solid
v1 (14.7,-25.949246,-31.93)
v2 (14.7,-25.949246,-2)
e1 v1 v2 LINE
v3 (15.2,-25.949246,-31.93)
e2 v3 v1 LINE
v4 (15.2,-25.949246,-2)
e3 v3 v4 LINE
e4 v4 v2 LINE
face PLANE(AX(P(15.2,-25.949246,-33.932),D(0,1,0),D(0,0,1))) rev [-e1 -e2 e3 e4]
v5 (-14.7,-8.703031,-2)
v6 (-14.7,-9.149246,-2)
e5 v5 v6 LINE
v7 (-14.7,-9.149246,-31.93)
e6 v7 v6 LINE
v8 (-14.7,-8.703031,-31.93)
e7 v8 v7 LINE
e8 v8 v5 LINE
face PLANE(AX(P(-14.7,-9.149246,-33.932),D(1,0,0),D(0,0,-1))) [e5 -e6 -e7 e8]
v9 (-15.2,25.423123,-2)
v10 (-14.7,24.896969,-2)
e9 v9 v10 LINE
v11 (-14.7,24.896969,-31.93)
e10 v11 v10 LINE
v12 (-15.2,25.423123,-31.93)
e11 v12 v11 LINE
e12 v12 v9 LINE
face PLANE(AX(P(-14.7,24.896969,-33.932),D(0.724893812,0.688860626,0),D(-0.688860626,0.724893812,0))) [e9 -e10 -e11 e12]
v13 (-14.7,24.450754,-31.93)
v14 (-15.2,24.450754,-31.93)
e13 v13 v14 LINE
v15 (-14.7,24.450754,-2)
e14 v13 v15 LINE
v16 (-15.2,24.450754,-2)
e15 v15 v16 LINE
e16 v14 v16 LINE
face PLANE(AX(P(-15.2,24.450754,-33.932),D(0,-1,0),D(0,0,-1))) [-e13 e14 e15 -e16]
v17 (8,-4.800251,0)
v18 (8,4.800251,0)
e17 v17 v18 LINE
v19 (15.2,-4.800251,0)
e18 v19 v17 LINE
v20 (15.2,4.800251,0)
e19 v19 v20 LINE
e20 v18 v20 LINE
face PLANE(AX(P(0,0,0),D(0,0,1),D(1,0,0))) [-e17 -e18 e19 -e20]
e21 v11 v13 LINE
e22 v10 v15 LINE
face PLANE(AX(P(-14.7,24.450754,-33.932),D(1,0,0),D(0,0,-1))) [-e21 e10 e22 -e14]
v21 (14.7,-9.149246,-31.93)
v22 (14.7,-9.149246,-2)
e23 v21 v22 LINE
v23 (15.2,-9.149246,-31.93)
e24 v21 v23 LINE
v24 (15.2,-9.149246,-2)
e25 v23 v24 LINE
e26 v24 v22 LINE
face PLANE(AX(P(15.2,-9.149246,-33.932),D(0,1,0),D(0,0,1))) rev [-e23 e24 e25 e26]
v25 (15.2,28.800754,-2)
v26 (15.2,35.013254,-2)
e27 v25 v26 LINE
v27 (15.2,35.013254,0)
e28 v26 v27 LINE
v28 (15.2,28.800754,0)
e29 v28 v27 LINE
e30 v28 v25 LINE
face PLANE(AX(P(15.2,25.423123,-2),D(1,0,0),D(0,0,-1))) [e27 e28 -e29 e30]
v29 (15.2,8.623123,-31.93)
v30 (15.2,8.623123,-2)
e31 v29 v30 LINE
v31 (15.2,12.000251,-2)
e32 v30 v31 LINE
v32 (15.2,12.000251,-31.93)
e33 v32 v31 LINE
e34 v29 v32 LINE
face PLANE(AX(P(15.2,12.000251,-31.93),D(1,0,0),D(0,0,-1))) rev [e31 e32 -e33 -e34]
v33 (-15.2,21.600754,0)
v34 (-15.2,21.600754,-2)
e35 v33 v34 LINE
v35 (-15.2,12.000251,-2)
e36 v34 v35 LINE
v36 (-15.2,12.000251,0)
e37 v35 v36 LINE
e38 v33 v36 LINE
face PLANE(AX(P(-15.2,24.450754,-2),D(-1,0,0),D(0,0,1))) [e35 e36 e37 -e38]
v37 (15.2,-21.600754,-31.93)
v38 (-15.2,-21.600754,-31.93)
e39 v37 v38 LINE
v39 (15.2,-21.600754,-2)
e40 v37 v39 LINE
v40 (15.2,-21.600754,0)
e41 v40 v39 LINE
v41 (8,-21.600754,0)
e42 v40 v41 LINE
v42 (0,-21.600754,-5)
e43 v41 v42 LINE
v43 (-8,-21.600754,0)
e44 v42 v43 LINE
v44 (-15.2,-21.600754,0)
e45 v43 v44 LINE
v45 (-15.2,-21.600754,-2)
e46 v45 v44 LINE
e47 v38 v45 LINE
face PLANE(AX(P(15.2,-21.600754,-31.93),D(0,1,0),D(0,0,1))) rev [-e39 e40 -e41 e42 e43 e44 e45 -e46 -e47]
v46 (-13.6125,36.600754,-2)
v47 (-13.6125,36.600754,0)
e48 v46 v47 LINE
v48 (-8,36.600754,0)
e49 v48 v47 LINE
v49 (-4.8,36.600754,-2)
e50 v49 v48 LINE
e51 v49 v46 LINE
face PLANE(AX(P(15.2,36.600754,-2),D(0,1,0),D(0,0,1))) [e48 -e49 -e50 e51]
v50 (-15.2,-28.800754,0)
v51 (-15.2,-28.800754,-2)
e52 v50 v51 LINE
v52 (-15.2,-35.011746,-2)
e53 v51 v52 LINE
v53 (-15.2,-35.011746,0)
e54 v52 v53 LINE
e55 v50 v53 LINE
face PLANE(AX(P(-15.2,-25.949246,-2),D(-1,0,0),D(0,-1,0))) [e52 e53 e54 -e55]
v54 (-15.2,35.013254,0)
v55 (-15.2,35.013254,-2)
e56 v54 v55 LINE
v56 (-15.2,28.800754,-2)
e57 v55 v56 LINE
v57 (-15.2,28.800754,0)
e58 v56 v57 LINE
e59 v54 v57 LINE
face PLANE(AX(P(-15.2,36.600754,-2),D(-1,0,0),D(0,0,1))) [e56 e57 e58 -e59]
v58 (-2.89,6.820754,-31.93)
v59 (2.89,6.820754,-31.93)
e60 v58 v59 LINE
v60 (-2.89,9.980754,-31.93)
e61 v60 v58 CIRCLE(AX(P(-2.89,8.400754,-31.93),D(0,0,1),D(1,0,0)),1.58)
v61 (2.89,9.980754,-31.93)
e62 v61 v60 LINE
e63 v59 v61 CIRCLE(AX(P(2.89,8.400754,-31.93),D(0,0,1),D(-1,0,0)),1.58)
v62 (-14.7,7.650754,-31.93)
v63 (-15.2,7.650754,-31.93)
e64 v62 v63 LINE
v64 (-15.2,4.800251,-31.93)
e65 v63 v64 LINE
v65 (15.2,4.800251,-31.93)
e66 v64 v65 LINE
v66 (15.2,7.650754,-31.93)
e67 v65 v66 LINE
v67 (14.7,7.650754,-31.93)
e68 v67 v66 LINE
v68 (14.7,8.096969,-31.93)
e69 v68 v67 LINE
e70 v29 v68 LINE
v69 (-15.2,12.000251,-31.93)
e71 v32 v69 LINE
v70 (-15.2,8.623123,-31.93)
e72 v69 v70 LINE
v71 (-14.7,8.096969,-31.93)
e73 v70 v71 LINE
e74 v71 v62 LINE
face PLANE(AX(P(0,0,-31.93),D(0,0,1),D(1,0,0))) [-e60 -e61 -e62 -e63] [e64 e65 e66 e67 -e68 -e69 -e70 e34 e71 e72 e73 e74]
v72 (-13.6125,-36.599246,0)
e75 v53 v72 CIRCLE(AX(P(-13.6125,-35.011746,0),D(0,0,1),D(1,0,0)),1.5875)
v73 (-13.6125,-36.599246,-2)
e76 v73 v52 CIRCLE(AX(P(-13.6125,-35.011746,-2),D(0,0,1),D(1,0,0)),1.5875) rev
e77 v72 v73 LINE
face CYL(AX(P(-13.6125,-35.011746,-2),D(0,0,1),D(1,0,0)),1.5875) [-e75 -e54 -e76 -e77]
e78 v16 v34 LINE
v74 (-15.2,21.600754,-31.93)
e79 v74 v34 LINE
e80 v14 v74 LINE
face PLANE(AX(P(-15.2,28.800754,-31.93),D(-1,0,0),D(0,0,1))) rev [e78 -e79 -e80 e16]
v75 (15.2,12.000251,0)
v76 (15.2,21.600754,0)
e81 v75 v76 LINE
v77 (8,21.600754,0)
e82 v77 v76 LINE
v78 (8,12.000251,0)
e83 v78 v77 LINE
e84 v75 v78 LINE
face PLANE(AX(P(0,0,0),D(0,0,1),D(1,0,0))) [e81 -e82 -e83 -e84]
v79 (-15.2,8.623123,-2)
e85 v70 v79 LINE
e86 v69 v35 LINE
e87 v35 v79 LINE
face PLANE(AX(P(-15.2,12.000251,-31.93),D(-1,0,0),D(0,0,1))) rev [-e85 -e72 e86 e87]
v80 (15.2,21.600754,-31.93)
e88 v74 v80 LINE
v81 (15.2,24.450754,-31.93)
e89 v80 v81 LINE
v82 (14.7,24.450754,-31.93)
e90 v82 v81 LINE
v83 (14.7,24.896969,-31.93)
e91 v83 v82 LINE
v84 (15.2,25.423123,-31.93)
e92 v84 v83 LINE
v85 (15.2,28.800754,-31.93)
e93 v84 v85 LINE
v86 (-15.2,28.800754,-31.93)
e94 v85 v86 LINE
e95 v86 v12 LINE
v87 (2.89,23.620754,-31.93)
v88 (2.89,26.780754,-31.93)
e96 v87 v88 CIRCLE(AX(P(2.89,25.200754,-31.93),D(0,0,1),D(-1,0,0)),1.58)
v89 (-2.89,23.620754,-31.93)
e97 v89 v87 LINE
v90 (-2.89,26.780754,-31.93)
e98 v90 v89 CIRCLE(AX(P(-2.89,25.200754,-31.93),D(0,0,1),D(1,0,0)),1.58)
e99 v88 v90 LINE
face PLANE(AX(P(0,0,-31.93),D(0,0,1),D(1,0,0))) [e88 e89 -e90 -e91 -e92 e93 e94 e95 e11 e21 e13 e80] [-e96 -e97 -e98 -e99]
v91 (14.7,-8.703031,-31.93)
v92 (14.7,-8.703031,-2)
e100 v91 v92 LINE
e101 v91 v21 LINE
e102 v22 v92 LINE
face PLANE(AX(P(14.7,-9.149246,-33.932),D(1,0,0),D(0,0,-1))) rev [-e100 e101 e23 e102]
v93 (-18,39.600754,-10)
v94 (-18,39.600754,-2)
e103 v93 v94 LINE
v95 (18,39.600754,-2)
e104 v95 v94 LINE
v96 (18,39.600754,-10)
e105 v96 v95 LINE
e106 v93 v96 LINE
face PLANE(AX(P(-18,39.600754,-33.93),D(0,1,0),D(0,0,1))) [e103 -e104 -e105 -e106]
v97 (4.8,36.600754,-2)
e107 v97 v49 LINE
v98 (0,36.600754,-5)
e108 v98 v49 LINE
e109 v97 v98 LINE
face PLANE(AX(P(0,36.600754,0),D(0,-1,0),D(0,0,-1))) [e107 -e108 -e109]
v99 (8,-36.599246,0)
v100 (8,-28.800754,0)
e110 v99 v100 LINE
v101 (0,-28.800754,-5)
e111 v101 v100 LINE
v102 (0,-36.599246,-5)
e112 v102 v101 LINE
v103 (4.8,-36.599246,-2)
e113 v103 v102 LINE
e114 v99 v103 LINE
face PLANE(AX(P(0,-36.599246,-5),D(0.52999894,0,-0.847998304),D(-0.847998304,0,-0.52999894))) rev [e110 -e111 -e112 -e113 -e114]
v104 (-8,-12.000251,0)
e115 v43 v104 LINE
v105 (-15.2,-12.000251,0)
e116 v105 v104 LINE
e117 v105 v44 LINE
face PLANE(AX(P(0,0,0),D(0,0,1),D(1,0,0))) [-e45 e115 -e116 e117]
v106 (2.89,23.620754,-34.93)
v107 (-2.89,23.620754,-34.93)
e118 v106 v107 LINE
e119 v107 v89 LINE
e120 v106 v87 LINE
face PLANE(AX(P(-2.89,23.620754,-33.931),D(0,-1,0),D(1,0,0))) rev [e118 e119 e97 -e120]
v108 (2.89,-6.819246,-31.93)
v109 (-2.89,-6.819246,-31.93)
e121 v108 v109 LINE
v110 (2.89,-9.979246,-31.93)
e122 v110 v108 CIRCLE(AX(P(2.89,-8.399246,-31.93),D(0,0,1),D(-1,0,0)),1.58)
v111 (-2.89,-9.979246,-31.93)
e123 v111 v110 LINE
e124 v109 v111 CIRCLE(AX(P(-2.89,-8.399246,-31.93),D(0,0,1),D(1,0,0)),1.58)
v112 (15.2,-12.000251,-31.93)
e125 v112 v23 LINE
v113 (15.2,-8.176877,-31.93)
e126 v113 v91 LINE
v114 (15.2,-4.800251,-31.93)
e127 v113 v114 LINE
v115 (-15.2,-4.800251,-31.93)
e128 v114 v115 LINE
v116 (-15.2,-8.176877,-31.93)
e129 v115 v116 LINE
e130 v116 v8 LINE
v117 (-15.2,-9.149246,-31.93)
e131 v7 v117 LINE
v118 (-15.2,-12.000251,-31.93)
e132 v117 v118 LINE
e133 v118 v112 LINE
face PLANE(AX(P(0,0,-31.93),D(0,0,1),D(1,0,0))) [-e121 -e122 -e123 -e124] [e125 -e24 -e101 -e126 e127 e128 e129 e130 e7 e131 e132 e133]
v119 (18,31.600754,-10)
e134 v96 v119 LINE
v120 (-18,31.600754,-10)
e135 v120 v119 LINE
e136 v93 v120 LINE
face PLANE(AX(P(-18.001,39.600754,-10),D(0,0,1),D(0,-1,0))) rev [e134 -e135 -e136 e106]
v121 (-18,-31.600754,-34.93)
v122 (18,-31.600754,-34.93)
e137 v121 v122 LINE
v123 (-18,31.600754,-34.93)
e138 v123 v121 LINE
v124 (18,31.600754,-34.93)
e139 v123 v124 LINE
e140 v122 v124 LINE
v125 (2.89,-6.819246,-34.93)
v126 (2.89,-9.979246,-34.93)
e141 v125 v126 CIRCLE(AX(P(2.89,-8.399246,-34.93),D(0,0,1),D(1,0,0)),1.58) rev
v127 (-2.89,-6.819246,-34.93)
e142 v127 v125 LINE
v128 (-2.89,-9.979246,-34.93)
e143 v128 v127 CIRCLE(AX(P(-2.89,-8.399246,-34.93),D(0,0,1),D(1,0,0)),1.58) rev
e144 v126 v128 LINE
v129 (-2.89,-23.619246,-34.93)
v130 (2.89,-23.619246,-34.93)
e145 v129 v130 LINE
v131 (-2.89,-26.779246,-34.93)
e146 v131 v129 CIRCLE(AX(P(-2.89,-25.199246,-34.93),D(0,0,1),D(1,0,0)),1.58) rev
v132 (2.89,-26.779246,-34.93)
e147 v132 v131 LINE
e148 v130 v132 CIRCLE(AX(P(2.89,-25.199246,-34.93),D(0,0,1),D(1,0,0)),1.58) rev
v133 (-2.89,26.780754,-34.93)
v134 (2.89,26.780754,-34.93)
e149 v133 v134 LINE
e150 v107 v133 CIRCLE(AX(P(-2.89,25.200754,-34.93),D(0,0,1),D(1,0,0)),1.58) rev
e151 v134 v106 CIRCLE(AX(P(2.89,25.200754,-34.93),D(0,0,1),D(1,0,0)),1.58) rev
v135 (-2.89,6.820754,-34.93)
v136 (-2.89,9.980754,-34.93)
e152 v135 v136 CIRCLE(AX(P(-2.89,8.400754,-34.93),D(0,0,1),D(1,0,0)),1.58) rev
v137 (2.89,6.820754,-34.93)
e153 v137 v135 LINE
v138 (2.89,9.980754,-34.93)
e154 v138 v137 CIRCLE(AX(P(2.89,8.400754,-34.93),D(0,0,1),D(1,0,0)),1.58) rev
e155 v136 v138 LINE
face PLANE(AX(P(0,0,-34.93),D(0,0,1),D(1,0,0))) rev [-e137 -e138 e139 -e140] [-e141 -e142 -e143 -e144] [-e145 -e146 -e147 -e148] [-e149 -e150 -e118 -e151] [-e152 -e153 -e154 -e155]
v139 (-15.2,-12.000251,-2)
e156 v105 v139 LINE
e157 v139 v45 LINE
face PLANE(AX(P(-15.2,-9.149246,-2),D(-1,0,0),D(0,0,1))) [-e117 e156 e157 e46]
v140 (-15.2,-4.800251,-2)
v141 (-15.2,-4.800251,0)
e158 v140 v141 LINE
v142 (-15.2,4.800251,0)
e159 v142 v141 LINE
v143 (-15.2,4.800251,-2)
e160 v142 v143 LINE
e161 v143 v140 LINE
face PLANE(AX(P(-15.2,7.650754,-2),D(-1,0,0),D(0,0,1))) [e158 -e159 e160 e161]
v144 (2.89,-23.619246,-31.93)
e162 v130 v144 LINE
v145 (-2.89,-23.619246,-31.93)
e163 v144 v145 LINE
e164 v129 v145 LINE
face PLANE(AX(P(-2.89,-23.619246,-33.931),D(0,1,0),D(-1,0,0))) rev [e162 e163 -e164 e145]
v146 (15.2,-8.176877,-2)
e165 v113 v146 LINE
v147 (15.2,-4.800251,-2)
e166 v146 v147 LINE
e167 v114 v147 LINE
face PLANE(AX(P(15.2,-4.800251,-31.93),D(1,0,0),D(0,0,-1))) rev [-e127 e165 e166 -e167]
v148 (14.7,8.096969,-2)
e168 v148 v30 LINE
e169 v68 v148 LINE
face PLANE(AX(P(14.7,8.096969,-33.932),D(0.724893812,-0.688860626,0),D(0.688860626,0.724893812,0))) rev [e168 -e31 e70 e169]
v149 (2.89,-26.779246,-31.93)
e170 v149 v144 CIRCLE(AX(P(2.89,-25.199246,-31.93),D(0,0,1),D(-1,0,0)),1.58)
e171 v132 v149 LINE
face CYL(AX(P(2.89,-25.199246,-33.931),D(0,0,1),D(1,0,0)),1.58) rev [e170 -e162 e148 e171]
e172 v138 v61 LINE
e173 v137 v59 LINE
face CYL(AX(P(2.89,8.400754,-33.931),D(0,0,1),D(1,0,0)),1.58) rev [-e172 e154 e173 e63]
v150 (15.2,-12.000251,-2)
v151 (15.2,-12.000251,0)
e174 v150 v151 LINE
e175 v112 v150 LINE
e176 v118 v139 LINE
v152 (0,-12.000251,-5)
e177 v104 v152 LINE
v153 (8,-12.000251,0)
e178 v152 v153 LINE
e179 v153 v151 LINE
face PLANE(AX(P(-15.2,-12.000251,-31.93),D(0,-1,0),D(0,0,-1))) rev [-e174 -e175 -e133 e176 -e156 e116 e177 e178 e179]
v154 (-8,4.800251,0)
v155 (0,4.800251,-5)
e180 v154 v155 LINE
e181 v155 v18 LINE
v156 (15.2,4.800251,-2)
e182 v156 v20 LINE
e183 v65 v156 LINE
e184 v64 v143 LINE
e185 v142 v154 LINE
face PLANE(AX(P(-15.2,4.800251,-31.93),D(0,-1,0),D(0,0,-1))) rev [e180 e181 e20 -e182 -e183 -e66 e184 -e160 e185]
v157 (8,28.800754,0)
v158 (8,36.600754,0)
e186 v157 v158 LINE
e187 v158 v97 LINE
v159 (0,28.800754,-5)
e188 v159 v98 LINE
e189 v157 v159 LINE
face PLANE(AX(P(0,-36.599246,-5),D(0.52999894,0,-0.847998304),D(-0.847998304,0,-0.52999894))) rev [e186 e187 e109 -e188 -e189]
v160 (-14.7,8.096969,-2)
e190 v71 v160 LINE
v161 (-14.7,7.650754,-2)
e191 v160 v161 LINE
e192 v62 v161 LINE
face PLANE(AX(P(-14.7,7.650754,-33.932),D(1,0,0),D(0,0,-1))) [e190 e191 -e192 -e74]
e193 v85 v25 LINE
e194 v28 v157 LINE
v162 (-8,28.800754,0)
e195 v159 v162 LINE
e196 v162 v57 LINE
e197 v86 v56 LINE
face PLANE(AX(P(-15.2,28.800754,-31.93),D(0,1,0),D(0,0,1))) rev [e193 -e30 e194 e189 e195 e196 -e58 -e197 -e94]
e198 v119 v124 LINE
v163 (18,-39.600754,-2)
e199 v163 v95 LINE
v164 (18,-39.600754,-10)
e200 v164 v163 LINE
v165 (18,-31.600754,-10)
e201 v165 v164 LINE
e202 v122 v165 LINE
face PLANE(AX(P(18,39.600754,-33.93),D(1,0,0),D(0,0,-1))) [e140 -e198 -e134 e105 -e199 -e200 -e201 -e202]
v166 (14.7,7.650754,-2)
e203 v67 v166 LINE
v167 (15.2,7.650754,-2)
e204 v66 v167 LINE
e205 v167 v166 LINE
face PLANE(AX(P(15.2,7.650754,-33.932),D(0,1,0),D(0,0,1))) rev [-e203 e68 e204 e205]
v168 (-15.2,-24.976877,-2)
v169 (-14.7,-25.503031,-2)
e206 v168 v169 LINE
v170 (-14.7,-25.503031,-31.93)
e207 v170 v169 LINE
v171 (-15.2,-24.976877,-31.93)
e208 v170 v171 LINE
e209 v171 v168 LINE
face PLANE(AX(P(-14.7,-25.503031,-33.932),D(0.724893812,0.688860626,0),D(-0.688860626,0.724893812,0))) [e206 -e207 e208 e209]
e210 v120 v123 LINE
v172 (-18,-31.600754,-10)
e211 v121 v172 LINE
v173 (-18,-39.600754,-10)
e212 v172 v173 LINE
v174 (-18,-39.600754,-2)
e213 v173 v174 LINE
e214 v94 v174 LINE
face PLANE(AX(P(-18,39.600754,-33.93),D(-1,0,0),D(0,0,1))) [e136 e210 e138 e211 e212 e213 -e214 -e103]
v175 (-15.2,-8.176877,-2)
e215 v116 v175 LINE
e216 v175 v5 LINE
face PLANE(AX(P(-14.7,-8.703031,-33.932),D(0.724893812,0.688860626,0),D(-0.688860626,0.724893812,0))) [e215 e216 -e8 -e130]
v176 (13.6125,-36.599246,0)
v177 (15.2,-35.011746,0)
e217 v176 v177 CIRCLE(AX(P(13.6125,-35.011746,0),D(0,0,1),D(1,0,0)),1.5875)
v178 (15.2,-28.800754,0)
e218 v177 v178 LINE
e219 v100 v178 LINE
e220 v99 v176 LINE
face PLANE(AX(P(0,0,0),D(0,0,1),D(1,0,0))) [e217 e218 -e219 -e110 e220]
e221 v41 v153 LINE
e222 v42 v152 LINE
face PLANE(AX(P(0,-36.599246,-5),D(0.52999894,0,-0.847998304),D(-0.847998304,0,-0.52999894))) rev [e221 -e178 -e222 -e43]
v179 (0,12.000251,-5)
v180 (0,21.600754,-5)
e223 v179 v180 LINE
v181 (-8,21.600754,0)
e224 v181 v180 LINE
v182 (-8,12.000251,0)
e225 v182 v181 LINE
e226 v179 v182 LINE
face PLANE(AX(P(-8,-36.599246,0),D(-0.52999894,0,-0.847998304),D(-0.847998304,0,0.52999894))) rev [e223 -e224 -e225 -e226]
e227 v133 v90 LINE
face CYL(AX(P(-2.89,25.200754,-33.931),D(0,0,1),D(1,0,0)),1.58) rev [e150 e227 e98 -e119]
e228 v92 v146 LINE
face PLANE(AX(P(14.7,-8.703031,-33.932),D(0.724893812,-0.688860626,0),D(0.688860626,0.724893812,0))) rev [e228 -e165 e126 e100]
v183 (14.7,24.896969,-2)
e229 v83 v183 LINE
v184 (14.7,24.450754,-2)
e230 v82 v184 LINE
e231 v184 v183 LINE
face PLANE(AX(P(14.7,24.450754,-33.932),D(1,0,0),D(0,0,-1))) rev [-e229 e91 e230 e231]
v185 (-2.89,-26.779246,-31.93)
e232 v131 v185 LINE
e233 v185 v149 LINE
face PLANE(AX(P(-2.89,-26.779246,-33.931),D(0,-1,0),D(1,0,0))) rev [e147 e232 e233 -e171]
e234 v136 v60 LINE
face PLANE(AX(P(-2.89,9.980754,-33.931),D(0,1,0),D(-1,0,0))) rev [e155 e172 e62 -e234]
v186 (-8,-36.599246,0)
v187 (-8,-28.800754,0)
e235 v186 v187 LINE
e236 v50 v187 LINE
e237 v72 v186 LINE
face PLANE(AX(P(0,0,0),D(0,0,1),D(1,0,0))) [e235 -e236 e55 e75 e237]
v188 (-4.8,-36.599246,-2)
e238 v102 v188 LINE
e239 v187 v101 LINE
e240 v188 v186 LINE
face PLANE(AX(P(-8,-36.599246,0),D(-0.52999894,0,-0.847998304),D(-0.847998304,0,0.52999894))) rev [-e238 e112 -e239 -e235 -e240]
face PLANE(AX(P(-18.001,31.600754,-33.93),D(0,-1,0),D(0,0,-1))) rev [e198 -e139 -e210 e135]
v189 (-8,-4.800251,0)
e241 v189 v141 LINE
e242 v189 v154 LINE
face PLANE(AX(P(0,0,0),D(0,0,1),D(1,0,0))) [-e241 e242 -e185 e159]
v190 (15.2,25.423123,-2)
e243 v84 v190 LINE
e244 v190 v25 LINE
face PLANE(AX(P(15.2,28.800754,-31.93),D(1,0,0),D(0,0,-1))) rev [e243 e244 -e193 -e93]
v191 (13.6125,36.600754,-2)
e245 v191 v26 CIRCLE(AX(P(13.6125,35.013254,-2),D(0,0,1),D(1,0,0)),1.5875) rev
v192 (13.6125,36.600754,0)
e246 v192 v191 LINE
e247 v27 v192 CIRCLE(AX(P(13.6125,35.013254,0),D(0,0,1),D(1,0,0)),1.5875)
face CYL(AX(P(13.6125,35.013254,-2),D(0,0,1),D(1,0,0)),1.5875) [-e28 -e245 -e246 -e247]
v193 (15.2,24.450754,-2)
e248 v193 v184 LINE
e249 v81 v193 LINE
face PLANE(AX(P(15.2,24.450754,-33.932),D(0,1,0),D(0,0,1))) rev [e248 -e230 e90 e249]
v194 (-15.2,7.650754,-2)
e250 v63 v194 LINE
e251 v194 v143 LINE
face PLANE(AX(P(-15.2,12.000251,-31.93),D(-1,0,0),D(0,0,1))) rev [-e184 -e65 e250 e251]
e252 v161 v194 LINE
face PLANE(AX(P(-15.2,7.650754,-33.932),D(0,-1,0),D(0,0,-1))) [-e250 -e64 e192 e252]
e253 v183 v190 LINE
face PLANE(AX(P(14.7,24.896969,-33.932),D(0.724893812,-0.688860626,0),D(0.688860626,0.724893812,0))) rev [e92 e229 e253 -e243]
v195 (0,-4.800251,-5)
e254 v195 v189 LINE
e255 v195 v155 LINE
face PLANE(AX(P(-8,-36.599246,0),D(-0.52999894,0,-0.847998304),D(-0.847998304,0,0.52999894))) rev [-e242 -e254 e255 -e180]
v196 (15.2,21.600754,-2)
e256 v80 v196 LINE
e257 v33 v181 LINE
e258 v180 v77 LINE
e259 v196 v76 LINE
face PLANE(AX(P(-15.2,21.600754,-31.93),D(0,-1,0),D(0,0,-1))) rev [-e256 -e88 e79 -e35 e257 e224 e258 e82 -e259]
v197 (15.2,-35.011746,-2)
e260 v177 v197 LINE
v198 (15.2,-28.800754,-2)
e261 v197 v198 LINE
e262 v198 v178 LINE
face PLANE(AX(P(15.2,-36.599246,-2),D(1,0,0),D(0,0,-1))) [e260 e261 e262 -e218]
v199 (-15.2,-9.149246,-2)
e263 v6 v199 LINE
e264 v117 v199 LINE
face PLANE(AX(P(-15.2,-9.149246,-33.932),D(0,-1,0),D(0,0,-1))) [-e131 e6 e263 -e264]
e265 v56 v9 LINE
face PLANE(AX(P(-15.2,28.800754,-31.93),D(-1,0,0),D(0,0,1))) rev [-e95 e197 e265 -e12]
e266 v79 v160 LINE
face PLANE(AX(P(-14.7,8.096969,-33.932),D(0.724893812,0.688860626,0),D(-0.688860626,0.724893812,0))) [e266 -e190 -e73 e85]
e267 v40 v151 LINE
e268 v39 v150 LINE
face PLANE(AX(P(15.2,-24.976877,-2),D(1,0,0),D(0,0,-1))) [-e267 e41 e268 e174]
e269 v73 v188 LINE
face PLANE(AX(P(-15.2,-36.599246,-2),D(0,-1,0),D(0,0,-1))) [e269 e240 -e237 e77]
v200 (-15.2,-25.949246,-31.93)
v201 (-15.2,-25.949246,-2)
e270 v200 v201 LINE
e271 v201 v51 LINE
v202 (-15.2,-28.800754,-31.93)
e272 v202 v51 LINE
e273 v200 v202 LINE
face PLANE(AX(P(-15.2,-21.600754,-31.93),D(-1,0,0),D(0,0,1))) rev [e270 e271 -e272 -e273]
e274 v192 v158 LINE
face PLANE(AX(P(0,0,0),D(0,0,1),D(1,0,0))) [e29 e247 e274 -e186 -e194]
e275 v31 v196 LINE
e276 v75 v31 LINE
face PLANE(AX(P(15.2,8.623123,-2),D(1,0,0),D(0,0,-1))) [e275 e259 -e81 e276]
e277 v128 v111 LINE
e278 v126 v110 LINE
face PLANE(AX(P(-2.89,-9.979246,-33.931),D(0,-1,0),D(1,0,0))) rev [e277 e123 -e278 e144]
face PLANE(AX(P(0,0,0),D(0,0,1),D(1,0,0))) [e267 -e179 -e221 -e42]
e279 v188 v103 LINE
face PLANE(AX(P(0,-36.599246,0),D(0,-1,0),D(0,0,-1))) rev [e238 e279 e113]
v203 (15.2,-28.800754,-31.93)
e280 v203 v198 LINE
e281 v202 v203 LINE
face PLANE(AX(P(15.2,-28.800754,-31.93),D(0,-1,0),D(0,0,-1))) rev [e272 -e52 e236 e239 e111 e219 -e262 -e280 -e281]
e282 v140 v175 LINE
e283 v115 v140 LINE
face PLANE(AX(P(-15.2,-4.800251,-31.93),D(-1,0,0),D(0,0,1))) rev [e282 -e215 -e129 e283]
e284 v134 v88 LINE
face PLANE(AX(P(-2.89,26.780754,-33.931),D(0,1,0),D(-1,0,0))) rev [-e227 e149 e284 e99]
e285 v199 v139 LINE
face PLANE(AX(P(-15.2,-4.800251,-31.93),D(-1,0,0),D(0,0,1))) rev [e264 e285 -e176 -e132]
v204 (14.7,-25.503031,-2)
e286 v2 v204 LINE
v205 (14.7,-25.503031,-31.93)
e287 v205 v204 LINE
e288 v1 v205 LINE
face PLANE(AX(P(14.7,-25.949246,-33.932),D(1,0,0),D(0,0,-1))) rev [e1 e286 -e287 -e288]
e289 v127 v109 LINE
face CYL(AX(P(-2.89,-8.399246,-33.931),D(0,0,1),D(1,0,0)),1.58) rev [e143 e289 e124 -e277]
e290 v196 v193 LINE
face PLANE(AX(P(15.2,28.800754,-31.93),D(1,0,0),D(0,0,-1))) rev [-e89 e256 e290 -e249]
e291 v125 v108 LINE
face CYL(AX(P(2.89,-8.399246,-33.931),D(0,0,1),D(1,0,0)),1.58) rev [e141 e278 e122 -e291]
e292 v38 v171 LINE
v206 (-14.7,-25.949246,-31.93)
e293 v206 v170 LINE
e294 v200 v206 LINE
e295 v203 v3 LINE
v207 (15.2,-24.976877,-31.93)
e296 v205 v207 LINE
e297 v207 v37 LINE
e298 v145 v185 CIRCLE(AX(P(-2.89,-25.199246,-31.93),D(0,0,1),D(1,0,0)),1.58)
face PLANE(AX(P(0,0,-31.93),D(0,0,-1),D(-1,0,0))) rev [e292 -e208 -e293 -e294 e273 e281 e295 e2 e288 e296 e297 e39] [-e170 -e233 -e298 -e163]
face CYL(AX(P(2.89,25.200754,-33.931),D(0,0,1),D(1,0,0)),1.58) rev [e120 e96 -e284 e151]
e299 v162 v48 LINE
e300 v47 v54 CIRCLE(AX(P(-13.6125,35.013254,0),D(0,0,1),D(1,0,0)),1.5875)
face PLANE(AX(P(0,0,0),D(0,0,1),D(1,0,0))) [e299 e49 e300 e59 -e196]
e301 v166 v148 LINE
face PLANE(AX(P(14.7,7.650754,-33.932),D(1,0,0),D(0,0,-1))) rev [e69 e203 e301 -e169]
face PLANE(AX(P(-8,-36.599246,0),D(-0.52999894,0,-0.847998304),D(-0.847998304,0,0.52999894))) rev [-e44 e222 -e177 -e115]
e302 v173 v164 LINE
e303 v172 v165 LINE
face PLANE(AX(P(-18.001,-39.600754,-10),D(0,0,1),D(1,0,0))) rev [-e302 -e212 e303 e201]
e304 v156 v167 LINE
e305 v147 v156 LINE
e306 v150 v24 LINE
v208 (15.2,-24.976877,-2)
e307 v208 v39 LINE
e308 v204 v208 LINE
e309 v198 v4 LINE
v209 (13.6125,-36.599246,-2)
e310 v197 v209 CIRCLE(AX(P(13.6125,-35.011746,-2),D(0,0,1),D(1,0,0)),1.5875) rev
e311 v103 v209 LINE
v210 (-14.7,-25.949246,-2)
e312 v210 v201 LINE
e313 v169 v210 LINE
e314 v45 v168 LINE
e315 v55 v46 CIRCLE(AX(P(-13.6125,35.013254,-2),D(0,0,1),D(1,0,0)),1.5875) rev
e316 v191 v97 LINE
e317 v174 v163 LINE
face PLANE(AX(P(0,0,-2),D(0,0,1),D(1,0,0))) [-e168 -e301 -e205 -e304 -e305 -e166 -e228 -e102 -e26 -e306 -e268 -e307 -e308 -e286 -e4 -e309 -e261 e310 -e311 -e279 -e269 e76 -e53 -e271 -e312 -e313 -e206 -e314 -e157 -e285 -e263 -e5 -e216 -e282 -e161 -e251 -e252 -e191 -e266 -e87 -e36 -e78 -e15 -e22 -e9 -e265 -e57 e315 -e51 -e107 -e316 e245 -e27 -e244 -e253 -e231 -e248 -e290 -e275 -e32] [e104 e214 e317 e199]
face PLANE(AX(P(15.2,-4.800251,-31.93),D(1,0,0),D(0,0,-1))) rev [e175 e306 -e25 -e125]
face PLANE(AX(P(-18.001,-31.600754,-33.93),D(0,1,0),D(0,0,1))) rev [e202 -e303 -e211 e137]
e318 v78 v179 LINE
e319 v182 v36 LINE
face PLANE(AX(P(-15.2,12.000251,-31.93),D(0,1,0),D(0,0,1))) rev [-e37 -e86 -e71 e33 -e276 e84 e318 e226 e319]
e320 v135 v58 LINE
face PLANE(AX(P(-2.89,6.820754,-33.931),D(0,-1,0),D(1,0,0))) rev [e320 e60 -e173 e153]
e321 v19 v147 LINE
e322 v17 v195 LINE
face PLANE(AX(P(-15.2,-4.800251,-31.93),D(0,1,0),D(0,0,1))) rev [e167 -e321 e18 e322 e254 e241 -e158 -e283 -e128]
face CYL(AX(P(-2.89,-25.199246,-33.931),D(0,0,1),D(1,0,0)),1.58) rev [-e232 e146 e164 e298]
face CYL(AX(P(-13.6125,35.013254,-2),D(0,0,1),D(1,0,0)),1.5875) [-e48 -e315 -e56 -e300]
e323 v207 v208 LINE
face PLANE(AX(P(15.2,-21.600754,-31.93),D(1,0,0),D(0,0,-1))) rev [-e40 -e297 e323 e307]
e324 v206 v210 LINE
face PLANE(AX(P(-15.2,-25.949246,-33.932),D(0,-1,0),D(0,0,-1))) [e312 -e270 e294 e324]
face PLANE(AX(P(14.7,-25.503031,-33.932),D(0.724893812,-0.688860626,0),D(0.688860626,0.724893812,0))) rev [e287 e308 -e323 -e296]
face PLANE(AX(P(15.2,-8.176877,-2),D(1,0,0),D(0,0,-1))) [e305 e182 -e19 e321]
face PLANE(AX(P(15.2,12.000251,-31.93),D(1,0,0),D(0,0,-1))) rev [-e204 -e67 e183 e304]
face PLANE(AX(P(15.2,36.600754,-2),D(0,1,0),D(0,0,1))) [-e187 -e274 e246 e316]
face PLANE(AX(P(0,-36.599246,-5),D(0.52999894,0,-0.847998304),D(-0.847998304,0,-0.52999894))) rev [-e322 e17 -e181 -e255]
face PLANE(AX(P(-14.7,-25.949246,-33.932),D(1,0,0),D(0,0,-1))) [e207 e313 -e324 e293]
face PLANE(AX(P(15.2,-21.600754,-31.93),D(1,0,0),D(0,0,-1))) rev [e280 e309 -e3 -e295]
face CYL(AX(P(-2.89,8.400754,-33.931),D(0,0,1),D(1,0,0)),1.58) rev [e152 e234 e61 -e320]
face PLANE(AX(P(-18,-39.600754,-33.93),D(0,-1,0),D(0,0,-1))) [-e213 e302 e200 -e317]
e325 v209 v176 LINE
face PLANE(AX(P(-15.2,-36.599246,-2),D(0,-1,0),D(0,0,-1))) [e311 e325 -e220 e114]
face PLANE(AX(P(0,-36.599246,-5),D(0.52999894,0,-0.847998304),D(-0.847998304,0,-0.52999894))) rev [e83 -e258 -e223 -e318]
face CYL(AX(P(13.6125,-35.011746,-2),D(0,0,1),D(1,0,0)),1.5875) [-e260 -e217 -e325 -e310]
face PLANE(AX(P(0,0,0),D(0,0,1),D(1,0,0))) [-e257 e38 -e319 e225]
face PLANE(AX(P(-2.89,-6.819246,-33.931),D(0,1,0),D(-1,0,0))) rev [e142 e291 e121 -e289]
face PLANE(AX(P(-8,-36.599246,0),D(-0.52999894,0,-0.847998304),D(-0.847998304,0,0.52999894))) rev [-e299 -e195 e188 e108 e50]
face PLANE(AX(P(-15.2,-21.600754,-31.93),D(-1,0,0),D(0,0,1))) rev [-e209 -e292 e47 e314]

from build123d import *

# Parameters (mm, degrees)
SKETCH1_W              = 36
SKETCH1_H              = 79.20150733
BOSS_EXTRUDE1_DEPTH    = 33.93
CUT_EXTRUDE1_REACH     = 65.368
SKETCH2_W              = 23.93
SKETCH2_H              = 8
SKETCH3_W              = 30.4
SKETCH3_H              = 7.2
CUT_EXTRUDE2_DEPTH     = 31.93
CUT_EXTRUDE3_START     = -3
CUT_EXTRUDE3_DEPTH     = 73.2
CUT_EXTRUDE4_REACH     = 55.961
BOSS_EXTRUDE2_REACH    = 57.168
LPATTERN1_COUNT        = 4
LPATTERN1_PITCH        = 16.8
LPATTERN1_COPY_1_REACH = 57.168
LPATTERN1_COPY_2_REACH = 57.168
LPATTERN1_COPY_3_REACH = 57.168
SKETCH7_W              = 36
SKETCH7_H              = 79.20150733
CUT_EXTRUDE5_DEPTH     = 2
FILLET1_R              = 1.5875
MOVE_START             = -34.93
MOVE_FACE1_OUTLINE_W   = 36
MOVE_FACE1_OUTLINE_H   = 63.20150733
MOVE_FACE1_DEPTH       = 1


# Read off the part's stored shape, not the designer's step: Move Face1
with BuildPart() as part:
    # Sketch1 → Boss-Extrude1 (new body)
    with BuildSketch(Plane.XY):
        Rectangle(SKETCH1_W, SKETCH1_H)
    extrude(amount=-BOSS_EXTRUDE1_DEPTH)

    # Sketch2 → Cut-Extrude1 (cut, up to next)
    with BuildSketch(Plane(origin=(18, 0, 0), x_dir=(0, 0, -1), z_dir=(1, 0, 0)), mode=Mode.PRIVATE) as cut_extrude1_sk1:
        with Locations((21.965, 35.600753665)):
            Rectangle(SKETCH2_W, SKETCH2_H)
    cut_extrude1_tool1 = extrude(cut_extrude1_sk1.sketch, amount=-CUT_EXTRUDE1_REACH, mode=Mode.PRIVATE) & part.part
    # Sketch2 → Cut-Extrude1 (cut, up to next)
    with BuildSketch(Plane(origin=(18, 0, 0), x_dir=(0, 0, -1), z_dir=(1, 0, 0)), mode=Mode.PRIVATE) as cut_extrude1_sk2:
        with Locations((21.965, -35.600753665)):
            Rectangle(SKETCH2_W, SKETCH2_H)
    cut_extrude1_tool2 = extrude(cut_extrude1_sk2.sketch, amount=-CUT_EXTRUDE1_REACH, mode=Mode.PRIVATE) & part.part
    add(cut_extrude1_tool1.solids().sort_by_distance((18, 35.600754, -21.965))[0], mode=Mode.SUBTRACT)
    add(cut_extrude1_tool2.solids().sort_by_distance((18, -35.600754, -21.965))[0], mode=Mode.SUBTRACT)

    # Sketch3 → Cut-Extrude2 (cut)
    with BuildSketch(Plane.XY):
        with Locations((0, 8.400251222)):
            Rectangle(SKETCH3_W, SKETCH3_H)
        with Locations((0, 25.200753665)):
            Rectangle(SKETCH3_W, SKETCH3_H)
        with Locations((0, -8.400251222)):
            Rectangle(SKETCH3_W, SKETCH3_H)
        with Locations((0, -25.200753665)):
            Rectangle(SKETCH3_W, SKETCH3_H)
    extrude(amount=-CUT_EXTRUDE2_DEPTH, mode=Mode.SUBTRACT)

    # Sketch4 → Cut-Extrude3 (cut)
    with BuildSketch(Plane(origin=(0, 39.600753665, 0), x_dir=(1, 0, 0), z_dir=(0, 1, 0)).offset(CUT_EXTRUDE3_START)):
        Polygon((-8, 0), (0, 5), (8, 0), align=None)
    extrude(amount=-CUT_EXTRUDE3_DEPTH, mode=Mode.SUBTRACT)

    # Sketch5 → Cut-Extrude4 (cut, up to next)
    with BuildSketch(Plane.XY.offset(-31.93), mode=Mode.PRIVATE) as cut_extrude4_sk1:
        with BuildLine():
            Line((-2.89, 26.780753665), (2.89, 26.780753665))
            ThreePointArc((2.89, 26.780753665), (4.47, 25.200753665), (2.89, 23.620753665))
            Line((2.89, 23.620753665), (-2.89, 23.620753665))
            ThreePointArc((-2.89, 23.620753665), (-4.47, 25.200753665), (-2.89, 26.780753665))
        make_face()
    cut_extrude4_tool1 = extrude(cut_extrude4_sk1.sketch, amount=-CUT_EXTRUDE4_REACH, mode=Mode.PRIVATE) & part.part
    cut_extrude4 = cut_extrude4_tool1.solids().sort_by_distance((0, 25.200754, -31.93))[0]
    add(cut_extrude4, mode=Mode.SUBTRACT)

    # Sketch6 → Boss-Extrude2 (add, up to next)
    with BuildSketch(Plane.XY, mode=Mode.PRIVATE) as boss_extrude2_sk1:
        Polygon((-15.2, 25.423123011), (-15.2, 24.450753665), (-14.7, 24.450753665), (-14.7, 24.896968819), align=None)
    boss_extrude2_tool1 = extrude(boss_extrude2_sk1.sketch, amount=-BOSS_EXTRUDE2_REACH, mode=Mode.PRIVATE) - part.part
    boss_extrude2 = boss_extrude2_tool1.solids().sort_by_distance((-14.980908, 24.821662, 0))[0]
    add(boss_extrude2)

    # Mirror1: Boss-Extrude2 across plane
    add(boss_extrude2.mirror(Plane(origin=(0, 0, 0), x_dir=(0, 0, 1), z_dir=(1, 0, 0))))

    # LPattern1: Cut-Extrude4, Boss-Extrude2 ×4
    with Locations(*[(0, -i * LPATTERN1_PITCH, 0) for i in range(1, LPATTERN1_COUNT)]):
        add(cut_extrude4, mode=Mode.SUBTRACT)
        add(boss_extrude2)

    # LPattern1 copy 1 sketch → LPattern1 copy 1 (add, up to next)
    with BuildSketch(Plane(origin=(0, -16.8, 0), x_dir=(-1, 0, 0), z_dir=(0, 0, 1)), mode=Mode.PRIVATE) as lpattern1_copy_1_sk1:
        Polygon((-15.2, -25.423123011), (-15.2, -24.450753665), (-14.7, -24.450753665), (-14.7, -24.896968819), align=None)
    lpattern1_copy_1_tool1 = extrude(lpattern1_copy_1_sk1.sketch, amount=-LPATTERN1_COPY_1_REACH, mode=Mode.PRIVATE) - part.part
    add(lpattern1_copy_1_tool1.solids().sort_by_distance((14.980908, 8.021662, 0))[0])

    # LPattern1 copy 2 sketch → LPattern1 copy 2 (add, up to next)
    with BuildSketch(Plane(origin=(0, -33.6, 0), x_dir=(-1, 0, 0), z_dir=(0, 0, 1)), mode=Mode.PRIVATE) as lpattern1_copy_2_sk1:
        Polygon((-15.2, -25.423123011), (-15.2, -24.450753665), (-14.7, -24.450753665), (-14.7, -24.896968819), align=None)
    lpattern1_copy_2_tool1 = extrude(lpattern1_copy_2_sk1.sketch, amount=-LPATTERN1_COPY_2_REACH, mode=Mode.PRIVATE) - part.part
    add(lpattern1_copy_2_tool1.solids().sort_by_distance((14.980908, -8.778338, 0))[0])

    # LPattern1 copy 3 sketch → LPattern1 copy 3 (add, up to next)
    with BuildSketch(Plane(origin=(0, -50.4, 0), x_dir=(-1, 0, 0), z_dir=(0, 0, 1)), mode=Mode.PRIVATE) as lpattern1_copy_3_sk1:
        Polygon((-15.2, -25.423123011), (-15.2, -24.450753665), (-14.7, -24.450753665), (-14.7, -24.896968819), align=None)
    lpattern1_copy_3_tool1 = extrude(lpattern1_copy_3_sk1.sketch, amount=-LPATTERN1_COPY_3_REACH, mode=Mode.PRIVATE) - part.part
    add(lpattern1_copy_3_tool1.solids().sort_by_distance((14.980908, -25.578338, 0))[0])

    # Sketch7 → Cut-Extrude5 (cut)
    with BuildSketch(Plane.XY):
        Rectangle(SKETCH7_W, SKETCH7_H)
        Polygon((-15.2, -36.599246335), (15.2, -36.599246335), (15.2, -25.949246335), (14.7, -25.949246335), (14.7, -25.503031181), (15.2, -24.976876989), (15.2, -9.149246335), (14.7, -9.149246335), (14.7, -8.703031181), (15.2, -8.176876989), (15.2, 7.650753665), (14.7, 7.650753665), (14.7, 8.096968819), (15.2, 8.623123011), (15.2, 24.450753665), (14.7, 24.450753665), (14.7, 24.896968819), (15.2, 25.423123011), (15.2, 36.600753665), (-15.2, 36.600753665), (-15.2, 25.423123011), (-14.7, 24.896968819), (-14.7, 24.450753665), (-15.2, 24.450753665), (-15.2, 8.623123011), (-14.7, 8.096968819), (-14.7, 7.650753665), (-15.2, 7.650753665), (-15.2, -8.176876989), (-14.7, -8.703031181), (-14.7, -9.149246335), (-15.2, -9.149246335), (-15.2, -24.976876989), (-14.7, -25.503031181), (-14.7, -25.949246335), (-15.2, -25.949246335), align=None, mode=Mode.SUBTRACT)
    extrude(amount=-CUT_EXTRUDE5_DEPTH, mode=Mode.SUBTRACT)

    # Fillet1
    fillet1_edges = [part.edges().sort_by_distance(p)[0] for p in [
        (15.2, 36.600753665, -1),
        (-15.2, -36.599246335, -1),
        (-15.2, 36.600753665, -1),
        (15.2, -36.599246335, -1),
    ]]
    fillet(fillet1_edges, radius=FILLET1_R)

    # Move Face1 outline → Move Face1 (add)
    with BuildSketch(Plane.XY.offset(MOVE_START)):
        Rectangle(MOVE_FACE1_OUTLINE_W, MOVE_FACE1_OUTLINE_H)
        with BuildLine():
            ThreePointArc((-2.89, -26.779246335), (-4.47, -25.199246335), (-2.89, -23.619246335))
            Line((-2.89, -23.619246335), (2.89, -23.619246335))
            ThreePointArc((2.89, -23.619246335), (4.47, -25.199246335), (2.89, -26.779246335))
            Line((2.89, -26.779246335), (-2.89, -26.779246335))
        make_face(mode=Mode.SUBTRACT)
        with BuildLine():
            ThreePointArc((-2.89, -9.979246335), (-4.47, -8.399246335), (-2.89, -6.819246335))
            Line((-2.89, -6.819246335), (2.89, -6.819246335))
            ThreePointArc((2.89, -6.819246335), (4.47, -8.399246335), (2.89, -9.979246335))
            Line((2.89, -9.979246335), (-2.89, -9.979246335))
        make_face(mode=Mode.SUBTRACT)
        with BuildLine():
            ThreePointArc((-2.89, 6.820753665), (-4.47, 8.400753665), (-2.89, 9.980753665))
            Line((-2.89, 9.980753665), (2.89, 9.980753665))
            ThreePointArc((2.89, 9.980753665), (4.47, 8.400753665), (2.89, 6.820753665))
            Line((2.89, 6.820753665), (-2.89, 6.820753665))
        make_face(mode=Mode.SUBTRACT)
        with BuildLine():
            ThreePointArc((-2.89, 23.620753665), (-4.47, 25.200753665), (-2.89, 26.780753665))
            Line((-2.89, 26.780753665), (2.89, 26.780753665))
            ThreePointArc((2.89, 26.780753665), (4.47, 25.200753665), (2.89, 23.620753665))
            Line((2.89, 23.620753665), (-2.89, 23.620753665))
        make_face(mode=Mode.SUBTRACT)
    extrude(amount=MOVE_FACE1_DEPTH)


solid = part.part
